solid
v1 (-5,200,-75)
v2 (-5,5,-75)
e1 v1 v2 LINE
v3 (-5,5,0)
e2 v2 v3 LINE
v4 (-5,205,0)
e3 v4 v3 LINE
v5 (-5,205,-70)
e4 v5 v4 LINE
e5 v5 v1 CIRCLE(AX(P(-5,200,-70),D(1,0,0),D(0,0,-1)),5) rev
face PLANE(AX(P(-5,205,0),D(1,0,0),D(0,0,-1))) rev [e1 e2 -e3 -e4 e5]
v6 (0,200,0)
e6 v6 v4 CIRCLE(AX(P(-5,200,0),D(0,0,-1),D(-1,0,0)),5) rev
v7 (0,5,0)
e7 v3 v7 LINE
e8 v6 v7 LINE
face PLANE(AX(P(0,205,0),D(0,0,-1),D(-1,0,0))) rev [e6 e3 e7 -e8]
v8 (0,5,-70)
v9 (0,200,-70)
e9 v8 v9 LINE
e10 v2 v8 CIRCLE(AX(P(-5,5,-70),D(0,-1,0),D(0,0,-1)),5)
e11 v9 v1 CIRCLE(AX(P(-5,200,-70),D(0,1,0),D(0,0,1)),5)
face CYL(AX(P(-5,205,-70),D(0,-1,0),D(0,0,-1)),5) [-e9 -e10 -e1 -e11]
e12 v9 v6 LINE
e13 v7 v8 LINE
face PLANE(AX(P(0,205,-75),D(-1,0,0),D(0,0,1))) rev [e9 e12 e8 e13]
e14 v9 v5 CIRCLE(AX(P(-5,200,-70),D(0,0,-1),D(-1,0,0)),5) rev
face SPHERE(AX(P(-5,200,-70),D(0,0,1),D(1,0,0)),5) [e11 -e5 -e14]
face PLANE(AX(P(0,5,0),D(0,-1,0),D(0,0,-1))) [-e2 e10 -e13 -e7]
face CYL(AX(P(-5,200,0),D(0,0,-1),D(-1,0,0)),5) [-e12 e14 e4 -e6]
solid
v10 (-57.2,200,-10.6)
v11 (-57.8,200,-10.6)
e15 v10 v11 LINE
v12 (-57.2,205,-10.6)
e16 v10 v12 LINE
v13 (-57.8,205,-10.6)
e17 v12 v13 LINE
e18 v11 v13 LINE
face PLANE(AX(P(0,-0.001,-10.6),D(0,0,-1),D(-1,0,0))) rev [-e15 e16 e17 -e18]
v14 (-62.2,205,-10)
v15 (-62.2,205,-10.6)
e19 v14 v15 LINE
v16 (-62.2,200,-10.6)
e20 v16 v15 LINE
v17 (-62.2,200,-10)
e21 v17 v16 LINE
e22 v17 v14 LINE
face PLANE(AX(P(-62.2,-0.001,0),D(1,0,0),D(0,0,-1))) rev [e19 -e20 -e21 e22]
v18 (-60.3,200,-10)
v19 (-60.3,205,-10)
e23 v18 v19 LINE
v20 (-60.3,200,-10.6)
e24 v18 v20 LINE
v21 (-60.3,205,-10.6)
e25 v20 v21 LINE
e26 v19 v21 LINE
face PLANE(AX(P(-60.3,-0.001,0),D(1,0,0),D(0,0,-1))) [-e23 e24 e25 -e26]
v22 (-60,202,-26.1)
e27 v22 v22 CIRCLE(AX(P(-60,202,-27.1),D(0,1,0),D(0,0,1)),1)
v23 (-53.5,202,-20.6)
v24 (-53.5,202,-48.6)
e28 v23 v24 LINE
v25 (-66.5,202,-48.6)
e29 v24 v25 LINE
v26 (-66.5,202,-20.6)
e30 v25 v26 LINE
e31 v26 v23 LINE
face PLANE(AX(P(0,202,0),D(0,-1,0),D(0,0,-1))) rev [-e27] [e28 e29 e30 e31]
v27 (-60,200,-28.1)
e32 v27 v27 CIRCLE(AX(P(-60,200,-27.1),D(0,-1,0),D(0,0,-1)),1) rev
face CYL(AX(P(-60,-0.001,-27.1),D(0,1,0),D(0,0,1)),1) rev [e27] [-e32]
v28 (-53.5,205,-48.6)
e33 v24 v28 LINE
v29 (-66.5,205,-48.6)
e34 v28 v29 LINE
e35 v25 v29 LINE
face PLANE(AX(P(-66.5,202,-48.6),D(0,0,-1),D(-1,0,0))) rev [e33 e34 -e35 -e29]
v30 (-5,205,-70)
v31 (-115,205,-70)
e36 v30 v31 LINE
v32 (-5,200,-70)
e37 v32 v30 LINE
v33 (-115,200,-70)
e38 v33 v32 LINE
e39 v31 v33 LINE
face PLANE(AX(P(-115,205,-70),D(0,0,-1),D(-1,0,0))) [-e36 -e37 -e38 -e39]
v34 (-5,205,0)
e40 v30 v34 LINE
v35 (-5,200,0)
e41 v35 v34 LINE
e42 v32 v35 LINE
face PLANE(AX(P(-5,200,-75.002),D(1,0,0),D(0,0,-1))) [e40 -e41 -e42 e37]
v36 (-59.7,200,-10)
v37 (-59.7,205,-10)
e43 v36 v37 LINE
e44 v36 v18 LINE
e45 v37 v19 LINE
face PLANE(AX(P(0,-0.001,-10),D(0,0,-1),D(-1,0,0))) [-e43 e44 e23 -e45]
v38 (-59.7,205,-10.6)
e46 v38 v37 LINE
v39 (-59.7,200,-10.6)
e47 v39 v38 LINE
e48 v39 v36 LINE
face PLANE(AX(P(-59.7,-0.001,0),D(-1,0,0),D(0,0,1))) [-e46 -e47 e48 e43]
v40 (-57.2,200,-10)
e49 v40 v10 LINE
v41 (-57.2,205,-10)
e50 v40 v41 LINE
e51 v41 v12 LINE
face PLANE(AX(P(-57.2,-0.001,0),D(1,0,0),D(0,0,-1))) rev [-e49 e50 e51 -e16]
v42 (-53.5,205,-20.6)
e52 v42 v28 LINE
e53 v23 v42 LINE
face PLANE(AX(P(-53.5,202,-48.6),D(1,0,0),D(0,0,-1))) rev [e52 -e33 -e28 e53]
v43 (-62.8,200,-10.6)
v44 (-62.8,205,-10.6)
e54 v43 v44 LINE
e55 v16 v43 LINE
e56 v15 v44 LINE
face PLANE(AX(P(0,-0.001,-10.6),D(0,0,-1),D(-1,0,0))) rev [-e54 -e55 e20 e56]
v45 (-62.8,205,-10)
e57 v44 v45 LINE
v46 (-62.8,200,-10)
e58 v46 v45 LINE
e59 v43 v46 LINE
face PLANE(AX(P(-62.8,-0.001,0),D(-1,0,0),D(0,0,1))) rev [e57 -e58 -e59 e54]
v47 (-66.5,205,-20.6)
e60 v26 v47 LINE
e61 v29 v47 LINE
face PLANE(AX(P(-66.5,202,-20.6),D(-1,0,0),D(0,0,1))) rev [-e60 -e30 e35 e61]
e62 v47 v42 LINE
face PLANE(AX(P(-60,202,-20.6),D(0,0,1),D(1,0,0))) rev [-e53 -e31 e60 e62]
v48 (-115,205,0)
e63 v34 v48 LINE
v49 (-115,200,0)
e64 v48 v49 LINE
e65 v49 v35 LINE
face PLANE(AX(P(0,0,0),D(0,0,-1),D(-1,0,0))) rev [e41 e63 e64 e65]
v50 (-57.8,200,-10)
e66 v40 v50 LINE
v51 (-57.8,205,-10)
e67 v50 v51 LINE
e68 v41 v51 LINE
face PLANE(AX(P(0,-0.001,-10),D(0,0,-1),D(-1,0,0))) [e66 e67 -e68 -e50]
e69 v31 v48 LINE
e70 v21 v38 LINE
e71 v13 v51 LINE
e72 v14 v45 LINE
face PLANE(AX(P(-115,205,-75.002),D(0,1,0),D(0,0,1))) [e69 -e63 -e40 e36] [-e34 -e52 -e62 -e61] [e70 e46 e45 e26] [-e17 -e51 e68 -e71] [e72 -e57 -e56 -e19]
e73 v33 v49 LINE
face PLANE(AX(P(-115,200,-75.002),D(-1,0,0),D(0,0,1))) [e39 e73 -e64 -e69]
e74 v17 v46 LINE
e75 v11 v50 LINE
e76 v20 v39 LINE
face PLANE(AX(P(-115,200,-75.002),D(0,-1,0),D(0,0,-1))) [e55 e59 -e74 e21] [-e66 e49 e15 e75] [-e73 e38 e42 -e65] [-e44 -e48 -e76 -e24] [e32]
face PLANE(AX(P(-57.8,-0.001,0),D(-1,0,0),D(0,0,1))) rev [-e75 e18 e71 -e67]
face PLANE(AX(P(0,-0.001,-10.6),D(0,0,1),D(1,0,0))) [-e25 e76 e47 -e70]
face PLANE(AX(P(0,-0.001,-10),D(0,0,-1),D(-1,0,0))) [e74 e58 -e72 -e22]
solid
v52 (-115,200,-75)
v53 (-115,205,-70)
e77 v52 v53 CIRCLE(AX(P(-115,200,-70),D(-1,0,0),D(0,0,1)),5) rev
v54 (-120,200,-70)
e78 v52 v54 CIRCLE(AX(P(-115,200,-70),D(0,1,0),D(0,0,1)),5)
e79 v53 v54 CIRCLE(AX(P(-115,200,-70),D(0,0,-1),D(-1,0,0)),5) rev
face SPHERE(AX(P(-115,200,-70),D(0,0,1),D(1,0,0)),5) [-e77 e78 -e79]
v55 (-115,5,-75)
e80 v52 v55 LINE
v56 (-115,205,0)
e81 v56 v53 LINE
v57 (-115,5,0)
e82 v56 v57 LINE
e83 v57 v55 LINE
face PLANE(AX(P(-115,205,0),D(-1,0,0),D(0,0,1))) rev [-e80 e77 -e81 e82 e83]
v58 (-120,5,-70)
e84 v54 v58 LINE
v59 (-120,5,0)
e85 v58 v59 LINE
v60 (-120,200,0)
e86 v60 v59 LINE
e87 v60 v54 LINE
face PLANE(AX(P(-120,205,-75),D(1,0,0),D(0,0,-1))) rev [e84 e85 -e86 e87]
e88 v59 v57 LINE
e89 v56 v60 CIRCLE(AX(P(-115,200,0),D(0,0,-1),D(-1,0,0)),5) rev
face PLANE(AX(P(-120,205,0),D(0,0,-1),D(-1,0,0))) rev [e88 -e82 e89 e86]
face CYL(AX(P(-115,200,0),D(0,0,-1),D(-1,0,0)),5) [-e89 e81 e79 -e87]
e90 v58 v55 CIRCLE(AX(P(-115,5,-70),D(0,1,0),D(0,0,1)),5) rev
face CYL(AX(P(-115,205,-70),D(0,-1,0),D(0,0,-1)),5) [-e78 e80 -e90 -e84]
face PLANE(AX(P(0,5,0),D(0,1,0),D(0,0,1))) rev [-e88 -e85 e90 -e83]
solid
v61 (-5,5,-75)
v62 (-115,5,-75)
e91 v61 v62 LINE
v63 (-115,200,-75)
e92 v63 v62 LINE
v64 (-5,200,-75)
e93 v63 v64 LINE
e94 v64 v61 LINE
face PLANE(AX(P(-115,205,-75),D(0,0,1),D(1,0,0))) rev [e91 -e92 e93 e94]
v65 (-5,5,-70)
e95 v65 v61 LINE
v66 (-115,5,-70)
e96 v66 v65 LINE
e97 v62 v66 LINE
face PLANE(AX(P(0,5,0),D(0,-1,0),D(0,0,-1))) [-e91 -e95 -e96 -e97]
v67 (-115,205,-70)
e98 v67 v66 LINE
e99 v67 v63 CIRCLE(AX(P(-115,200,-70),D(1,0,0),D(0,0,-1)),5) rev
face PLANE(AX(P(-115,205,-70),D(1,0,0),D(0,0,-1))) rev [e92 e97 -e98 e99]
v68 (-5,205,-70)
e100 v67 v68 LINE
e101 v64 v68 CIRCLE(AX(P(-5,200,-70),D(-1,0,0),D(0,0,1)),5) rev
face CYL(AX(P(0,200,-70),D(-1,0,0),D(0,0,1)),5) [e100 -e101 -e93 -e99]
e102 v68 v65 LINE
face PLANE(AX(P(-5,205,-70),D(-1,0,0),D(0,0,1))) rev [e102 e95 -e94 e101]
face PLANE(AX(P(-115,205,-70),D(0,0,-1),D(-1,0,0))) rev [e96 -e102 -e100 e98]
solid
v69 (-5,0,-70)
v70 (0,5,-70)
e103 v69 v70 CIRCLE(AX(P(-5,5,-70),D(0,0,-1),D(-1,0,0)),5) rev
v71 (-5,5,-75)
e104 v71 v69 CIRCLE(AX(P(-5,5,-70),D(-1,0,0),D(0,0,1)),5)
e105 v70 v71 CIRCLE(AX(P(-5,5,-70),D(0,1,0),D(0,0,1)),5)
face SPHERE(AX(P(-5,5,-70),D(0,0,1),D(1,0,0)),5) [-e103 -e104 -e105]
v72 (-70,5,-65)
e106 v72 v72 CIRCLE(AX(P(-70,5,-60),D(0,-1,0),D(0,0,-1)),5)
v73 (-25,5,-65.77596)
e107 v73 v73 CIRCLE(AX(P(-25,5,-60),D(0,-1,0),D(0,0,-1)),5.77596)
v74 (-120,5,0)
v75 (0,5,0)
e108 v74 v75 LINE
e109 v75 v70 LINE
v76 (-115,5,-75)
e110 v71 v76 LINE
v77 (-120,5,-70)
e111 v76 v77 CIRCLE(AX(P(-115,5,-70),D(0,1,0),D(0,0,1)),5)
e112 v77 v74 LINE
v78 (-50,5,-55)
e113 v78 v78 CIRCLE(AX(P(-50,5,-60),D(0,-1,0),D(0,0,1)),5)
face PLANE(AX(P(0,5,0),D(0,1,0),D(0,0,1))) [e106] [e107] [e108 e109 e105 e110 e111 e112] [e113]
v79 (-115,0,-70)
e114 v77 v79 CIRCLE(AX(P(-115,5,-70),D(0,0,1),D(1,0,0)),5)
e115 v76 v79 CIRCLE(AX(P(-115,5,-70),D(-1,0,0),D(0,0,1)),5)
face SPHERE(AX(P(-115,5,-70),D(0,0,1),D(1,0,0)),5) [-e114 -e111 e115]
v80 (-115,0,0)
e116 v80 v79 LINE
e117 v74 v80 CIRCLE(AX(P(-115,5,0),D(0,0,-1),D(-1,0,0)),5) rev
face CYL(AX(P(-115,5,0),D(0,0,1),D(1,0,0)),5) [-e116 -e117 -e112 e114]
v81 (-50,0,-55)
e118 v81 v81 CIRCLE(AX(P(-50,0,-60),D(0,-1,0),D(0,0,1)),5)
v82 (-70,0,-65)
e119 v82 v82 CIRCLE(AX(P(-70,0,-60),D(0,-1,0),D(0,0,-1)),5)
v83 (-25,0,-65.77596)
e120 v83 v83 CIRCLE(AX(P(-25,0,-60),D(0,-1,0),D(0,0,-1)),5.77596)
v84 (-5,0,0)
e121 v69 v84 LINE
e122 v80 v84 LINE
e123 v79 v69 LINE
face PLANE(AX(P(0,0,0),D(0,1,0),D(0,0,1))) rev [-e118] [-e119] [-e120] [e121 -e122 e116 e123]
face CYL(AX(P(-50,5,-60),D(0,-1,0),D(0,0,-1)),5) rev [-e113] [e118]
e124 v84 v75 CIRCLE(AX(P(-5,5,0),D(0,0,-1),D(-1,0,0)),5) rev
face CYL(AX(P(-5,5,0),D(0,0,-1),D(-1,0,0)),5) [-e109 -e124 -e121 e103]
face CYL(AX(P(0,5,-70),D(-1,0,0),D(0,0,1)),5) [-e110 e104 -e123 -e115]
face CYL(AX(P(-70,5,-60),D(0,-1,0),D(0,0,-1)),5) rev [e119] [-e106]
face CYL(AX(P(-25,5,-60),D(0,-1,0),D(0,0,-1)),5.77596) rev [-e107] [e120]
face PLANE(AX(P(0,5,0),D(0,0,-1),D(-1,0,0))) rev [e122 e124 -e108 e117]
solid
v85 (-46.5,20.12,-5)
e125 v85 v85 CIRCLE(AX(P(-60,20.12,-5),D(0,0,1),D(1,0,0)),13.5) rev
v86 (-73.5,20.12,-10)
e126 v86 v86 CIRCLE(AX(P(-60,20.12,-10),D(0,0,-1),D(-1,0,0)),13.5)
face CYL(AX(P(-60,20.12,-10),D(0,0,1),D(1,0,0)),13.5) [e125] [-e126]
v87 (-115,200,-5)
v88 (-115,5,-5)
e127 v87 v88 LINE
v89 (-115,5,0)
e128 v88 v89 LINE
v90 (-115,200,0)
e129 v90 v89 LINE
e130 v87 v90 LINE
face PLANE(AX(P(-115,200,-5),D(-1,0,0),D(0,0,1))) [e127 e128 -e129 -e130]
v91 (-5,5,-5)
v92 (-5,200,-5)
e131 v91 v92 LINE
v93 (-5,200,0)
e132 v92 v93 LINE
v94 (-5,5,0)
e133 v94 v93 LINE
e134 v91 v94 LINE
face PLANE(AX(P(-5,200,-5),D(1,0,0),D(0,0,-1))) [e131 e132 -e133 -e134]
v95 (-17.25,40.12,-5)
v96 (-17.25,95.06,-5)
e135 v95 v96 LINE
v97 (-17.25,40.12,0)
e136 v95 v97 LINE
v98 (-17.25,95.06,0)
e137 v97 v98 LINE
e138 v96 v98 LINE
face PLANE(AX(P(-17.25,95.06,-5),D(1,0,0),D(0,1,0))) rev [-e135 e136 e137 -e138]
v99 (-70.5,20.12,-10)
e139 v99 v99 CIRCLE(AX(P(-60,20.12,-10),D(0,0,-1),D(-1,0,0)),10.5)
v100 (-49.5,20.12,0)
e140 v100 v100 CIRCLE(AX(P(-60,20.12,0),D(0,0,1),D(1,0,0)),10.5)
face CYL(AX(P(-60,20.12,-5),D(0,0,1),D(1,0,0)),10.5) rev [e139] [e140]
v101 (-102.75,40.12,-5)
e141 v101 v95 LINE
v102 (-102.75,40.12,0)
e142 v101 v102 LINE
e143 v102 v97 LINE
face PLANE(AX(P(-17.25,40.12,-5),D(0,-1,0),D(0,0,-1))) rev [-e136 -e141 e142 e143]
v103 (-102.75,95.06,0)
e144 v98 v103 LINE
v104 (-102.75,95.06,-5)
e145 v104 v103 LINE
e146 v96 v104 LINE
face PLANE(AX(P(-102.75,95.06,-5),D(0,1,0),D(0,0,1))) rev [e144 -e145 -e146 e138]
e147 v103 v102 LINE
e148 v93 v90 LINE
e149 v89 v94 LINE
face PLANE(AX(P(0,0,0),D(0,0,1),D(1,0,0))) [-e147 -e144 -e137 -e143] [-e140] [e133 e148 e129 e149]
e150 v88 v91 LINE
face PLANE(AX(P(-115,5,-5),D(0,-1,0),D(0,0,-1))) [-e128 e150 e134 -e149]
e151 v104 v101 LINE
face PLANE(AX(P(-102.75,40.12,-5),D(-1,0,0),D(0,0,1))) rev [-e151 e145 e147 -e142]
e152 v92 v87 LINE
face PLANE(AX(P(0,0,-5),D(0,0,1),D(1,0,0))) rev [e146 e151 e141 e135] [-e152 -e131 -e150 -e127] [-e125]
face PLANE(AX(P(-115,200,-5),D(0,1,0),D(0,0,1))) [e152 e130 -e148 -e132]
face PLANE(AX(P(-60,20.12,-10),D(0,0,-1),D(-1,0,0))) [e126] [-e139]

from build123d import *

# Parameters (mm, degrees)
SKETCH5_W             = 120
SKETCH5_H             = 75
BOSS_EXTRUDE4_DEPTH   = 5
FILLET1_R             = 5
SKETCH7_W             = 5
SKETCH7_H             = 75
BOSS_EXTRUDE7_DEPTH   = 200
BOSS_EXTRUDE7_2_DEPTH = 200
FILLET3_R             = 5
SKETCH8_W             = 110
SKETCH8_H             = 5
BOSS_EXTRUDE8_DEPTH   = 200
FILLET5_R             = 5
BOSS_EXTRUDE9_REACH   = 251.098
SKETCH13_W            = 110
SKETCH13_H            = 5
FILLET7_R             = 5
FILLET8_R             = 5
FILLET9_R             = 5
FILLET10_R            = 5
SKETCH14_W            = 110
SKETCH14_H            = 195
BOSS_EXTRUDE10_DEPTH  = 5
SKETCH15_R            = 10.5
CUT_EXTRUDE8_DEPTH    = 5
SKETCH16_R            = 13.5
SKETCH16_R_2          = 10.5
BOSS_EXTRUDE11_DEPTH  = 5
SKETCH17_R            = 5
SKETCH17_R_2          = 5.77596
CUT_EXTRUDE9_DEPTH    = 5
CUT_EXTRUDE10_DEPTH   = 5
CUT_EXTRUDE11_DEPTH   = 3
SKETCH20_R            = 1
CUT_EXTRUDE12_DEPTH   = 2


with BuildPart() as part:
    # Sketch5 → Boss-Extrude4 (new body)
    with BuildSketch(Plane(origin=(0, 0, 0), x_dir=(1, 0, 0), z_dir=(0, 1, 0))):
        with Locations((-60, 37.5)):
            Rectangle(SKETCH5_W, SKETCH5_H)
    extrude(amount=BOSS_EXTRUDE4_DEPTH)

    # Fillet1
    fillet1_edges = [part.edges().sort_by_distance(p)[0] for p in [
        (0, 0, -37.5),
        (-120, 0, -37.5),
    ]]
    fillet(fillet1_edges, radius=FILLET1_R - 0.0001)  # a hair under: the kernel refuses the full size

    # Fillet10
    fillet10_edges = [part.edges().sort_by_distance(p)[0] for p in [
        (-60, 0, -75),
        (-118.535563195, 1.464436805, -75),
        (-1.464436805, 1.464436805, -75),
    ]]
    fillet(fillet10_edges, radius=FILLET10_R - 0.0001)  # a hair under: the kernel refuses the full size

    # Sketch17 → Cut-Extrude9 (cut)
    with BuildSketch(Plane.XZ):
        with Locations(Location((-70, -60, 0), (0, 0, 270))):
            Circle(SKETCH17_R)
        with Locations(Location((-50, -60, 0), (0, 0, 90))):
            Circle(SKETCH17_R)
        with Locations(Location((-25, -60, 0), (0, 0, 270))):
            Circle(SKETCH17_R_2)
    extrude(amount=-CUT_EXTRUDE9_DEPTH, mode=Mode.SUBTRACT)


with BuildPart() as body_2:
    # Sketch7 → Boss-Extrude7 (new body)
    with BuildSketch(Plane(origin=(0, 5, 0), x_dir=(1, 0, 0), z_dir=(0, 1, 0))):
        with Locations((-117.5, 37.5)):
            Rectangle(SKETCH7_W, SKETCH7_H)
    extrude(amount=BOSS_EXTRUDE7_DEPTH)

    # Fillet3
    fillet3_edges = [body_2.edges().sort_by_distance(p)[0] for p in [
        (-120, 205, -37.5),
    ]]
    fillet(fillet3_edges, radius=FILLET3_R - 0.0001)  # a hair under: the kernel refuses the full size

    # Fillet7
    fillet7_edges = [body_2.edges().sort_by_distance(p)[0] for p in [
        (-118.535563195, 203.535563195, -75),
        (-120, 102.50005, -75),
    ]]
    fillet(fillet7_edges, radius=FILLET7_R - 0.0001)  # a hair under: the kernel refuses the full size


with BuildPart() as body_3:
    # Sketch7 → Boss-Extrude7 2 (new body)
    with BuildSketch(Plane(origin=(0, 5, 0), x_dir=(1, 0, 0), z_dir=(0, 1, 0))):
        with Locations((-2.5, 37.5)):
            Rectangle(SKETCH7_W, SKETCH7_H)
    extrude(amount=BOSS_EXTRUDE7_2_DEPTH)

    # Fillet5
    fillet5_edges = [body_3.edges().sort_by_distance(p)[0] for p in [
        (0, 205, -37.5),
    ]]
    fillet(fillet5_edges, radius=FILLET5_R - 0.0001)  # a hair under: the kernel refuses the full size

    # Fillet8
    fillet8_edges = [body_3.edges().sort_by_distance(p)[0] for p in [
        (-1.464436805, 203.535563195, -75),
        (0, 102.50005, -75),
    ]]
    fillet(fillet8_edges, radius=FILLET8_R - 0.0001)  # a hair under: the kernel refuses the full size


with BuildPart() as body_4:
    # Sketch8 → Boss-Extrude8 (new body)
    with BuildSketch(Plane(origin=(0, 5, 0), x_dir=(1, 0, 0), z_dir=(0, 1, 0))):
        with Locations((-60, 72.5)):
            Rectangle(SKETCH8_W, SKETCH8_H)
    extrude(amount=BOSS_EXTRUDE8_DEPTH)


with BuildPart() as body_5:

    # Sketch13 → Boss-Extrude9 (new, up to next)
    with BuildSketch(Plane.XY, mode=Mode.PRIVATE) as boss_extrude9_sk1:
        with Locations((-60, 202.5)):
            Rectangle(SKETCH13_W, SKETCH13_H)
    boss_extrude9_tool1 = extrude(boss_extrude9_sk1.sketch, amount=-BOSS_EXTRUDE9_REACH, mode=Mode.PRIVATE) - body_4.part
    add(boss_extrude9_tool1.solids().sort_by_distance((-60, 202.5, 0))[0])

    # Sketch18 → Cut-Extrude10 (cut)
    with BuildSketch(Plane(origin=(0, 205, 0), x_dir=(1, 0, 0), z_dir=(0, 1, 0))):
        Polygon((-62.5, 10), (-62.8, 10), (-62.8, 10.6), (-62.2, 10.6), (-62.2, 10), align=None)
        Polygon((-59.7, 10.6), (-59.7, 10), (-60, 10), (-60.3, 10), (-60.3, 10.6), align=None)
        Polygon((-57.5, 10), (-57.8, 10), (-57.8, 10.6), (-57.2, 10.6), (-57.2, 10), align=None)
    extrude(amount=-CUT_EXTRUDE10_DEPTH, mode=Mode.SUBTRACT)

    # Sketch19 → Cut-Extrude11 (cut)
    with BuildSketch(Plane(origin=(0, 205, 0), x_dir=(1, 0, 0), z_dir=(0, 1, 0))):
        Polygon((-60, 20.6), (-66.5, 20.6), (-66.5, 48.6), (-60, 48.6), (-53.5, 48.6), (-53.5, 20.6), align=None)
    extrude(amount=-CUT_EXTRUDE11_DEPTH, mode=Mode.SUBTRACT)

    # Sketch20 → Cut-Extrude12 (cut)
    with BuildSketch(Plane(origin=(0, 202, 0), x_dir=(1, 0, 0), z_dir=(0, 1, 0))):
        with Locations(Location((-60, 27.1, 0), (0, 0, 270))):
            Circle(SKETCH20_R)
    extrude(amount=-CUT_EXTRUDE12_DEPTH, mode=Mode.SUBTRACT)


with BuildPart() as body_4_1:
    add(body_4.part)

    # Fillet9
    fillet9_edges = [body_4_1.edges().sort_by_distance(p)[0] for p in [
        (-60, 205, -75),
    ]]
    fillet(fillet9_edges, radius=FILLET9_R - 0.0001)  # a hair under: the kernel refuses the full size


with BuildPart() as body_6:
    # Sketch14 → Boss-Extrude10 (new body)
    with BuildSketch(Plane.XY):
        with Locations((-60, 102.5)):
            Rectangle(SKETCH14_W, SKETCH14_H)
    extrude(amount=-BOSS_EXTRUDE10_DEPTH)

    # Sketch15 → Cut-Extrude8 (cut)
    with BuildSketch(Plane.XY):
        with Locations((-60, 20.12)):
            Circle(SKETCH15_R)
        Polygon((-17.25, 95.06), (-17.25, 40.12), (-60, 40.12), (-102.75, 40.12), (-102.75, 95.06), align=None)
    extrude(amount=-CUT_EXTRUDE8_DEPTH, mode=Mode.SUBTRACT)

    # Sketch16 → Boss-Extrude11 (add)
    with BuildSketch(Plane(origin=(0, 0, -5), x_dir=(-1, 0, 0), z_dir=(0, 0, -1))):
        with Locations(Location((60, 20.12, 0), (0, 0, 180))):
            Circle(SKETCH16_R)
        with Locations(Location((60, 20.12, 0), (0, 0, 180))):
            Circle(SKETCH16_R_2, mode=Mode.SUBTRACT)
    extrude(amount=BOSS_EXTRUDE11_DEPTH)


solid = Compound([part.part, body_2.part, body_3.part, body_5.part, body_4_1.part, body_6.part])
